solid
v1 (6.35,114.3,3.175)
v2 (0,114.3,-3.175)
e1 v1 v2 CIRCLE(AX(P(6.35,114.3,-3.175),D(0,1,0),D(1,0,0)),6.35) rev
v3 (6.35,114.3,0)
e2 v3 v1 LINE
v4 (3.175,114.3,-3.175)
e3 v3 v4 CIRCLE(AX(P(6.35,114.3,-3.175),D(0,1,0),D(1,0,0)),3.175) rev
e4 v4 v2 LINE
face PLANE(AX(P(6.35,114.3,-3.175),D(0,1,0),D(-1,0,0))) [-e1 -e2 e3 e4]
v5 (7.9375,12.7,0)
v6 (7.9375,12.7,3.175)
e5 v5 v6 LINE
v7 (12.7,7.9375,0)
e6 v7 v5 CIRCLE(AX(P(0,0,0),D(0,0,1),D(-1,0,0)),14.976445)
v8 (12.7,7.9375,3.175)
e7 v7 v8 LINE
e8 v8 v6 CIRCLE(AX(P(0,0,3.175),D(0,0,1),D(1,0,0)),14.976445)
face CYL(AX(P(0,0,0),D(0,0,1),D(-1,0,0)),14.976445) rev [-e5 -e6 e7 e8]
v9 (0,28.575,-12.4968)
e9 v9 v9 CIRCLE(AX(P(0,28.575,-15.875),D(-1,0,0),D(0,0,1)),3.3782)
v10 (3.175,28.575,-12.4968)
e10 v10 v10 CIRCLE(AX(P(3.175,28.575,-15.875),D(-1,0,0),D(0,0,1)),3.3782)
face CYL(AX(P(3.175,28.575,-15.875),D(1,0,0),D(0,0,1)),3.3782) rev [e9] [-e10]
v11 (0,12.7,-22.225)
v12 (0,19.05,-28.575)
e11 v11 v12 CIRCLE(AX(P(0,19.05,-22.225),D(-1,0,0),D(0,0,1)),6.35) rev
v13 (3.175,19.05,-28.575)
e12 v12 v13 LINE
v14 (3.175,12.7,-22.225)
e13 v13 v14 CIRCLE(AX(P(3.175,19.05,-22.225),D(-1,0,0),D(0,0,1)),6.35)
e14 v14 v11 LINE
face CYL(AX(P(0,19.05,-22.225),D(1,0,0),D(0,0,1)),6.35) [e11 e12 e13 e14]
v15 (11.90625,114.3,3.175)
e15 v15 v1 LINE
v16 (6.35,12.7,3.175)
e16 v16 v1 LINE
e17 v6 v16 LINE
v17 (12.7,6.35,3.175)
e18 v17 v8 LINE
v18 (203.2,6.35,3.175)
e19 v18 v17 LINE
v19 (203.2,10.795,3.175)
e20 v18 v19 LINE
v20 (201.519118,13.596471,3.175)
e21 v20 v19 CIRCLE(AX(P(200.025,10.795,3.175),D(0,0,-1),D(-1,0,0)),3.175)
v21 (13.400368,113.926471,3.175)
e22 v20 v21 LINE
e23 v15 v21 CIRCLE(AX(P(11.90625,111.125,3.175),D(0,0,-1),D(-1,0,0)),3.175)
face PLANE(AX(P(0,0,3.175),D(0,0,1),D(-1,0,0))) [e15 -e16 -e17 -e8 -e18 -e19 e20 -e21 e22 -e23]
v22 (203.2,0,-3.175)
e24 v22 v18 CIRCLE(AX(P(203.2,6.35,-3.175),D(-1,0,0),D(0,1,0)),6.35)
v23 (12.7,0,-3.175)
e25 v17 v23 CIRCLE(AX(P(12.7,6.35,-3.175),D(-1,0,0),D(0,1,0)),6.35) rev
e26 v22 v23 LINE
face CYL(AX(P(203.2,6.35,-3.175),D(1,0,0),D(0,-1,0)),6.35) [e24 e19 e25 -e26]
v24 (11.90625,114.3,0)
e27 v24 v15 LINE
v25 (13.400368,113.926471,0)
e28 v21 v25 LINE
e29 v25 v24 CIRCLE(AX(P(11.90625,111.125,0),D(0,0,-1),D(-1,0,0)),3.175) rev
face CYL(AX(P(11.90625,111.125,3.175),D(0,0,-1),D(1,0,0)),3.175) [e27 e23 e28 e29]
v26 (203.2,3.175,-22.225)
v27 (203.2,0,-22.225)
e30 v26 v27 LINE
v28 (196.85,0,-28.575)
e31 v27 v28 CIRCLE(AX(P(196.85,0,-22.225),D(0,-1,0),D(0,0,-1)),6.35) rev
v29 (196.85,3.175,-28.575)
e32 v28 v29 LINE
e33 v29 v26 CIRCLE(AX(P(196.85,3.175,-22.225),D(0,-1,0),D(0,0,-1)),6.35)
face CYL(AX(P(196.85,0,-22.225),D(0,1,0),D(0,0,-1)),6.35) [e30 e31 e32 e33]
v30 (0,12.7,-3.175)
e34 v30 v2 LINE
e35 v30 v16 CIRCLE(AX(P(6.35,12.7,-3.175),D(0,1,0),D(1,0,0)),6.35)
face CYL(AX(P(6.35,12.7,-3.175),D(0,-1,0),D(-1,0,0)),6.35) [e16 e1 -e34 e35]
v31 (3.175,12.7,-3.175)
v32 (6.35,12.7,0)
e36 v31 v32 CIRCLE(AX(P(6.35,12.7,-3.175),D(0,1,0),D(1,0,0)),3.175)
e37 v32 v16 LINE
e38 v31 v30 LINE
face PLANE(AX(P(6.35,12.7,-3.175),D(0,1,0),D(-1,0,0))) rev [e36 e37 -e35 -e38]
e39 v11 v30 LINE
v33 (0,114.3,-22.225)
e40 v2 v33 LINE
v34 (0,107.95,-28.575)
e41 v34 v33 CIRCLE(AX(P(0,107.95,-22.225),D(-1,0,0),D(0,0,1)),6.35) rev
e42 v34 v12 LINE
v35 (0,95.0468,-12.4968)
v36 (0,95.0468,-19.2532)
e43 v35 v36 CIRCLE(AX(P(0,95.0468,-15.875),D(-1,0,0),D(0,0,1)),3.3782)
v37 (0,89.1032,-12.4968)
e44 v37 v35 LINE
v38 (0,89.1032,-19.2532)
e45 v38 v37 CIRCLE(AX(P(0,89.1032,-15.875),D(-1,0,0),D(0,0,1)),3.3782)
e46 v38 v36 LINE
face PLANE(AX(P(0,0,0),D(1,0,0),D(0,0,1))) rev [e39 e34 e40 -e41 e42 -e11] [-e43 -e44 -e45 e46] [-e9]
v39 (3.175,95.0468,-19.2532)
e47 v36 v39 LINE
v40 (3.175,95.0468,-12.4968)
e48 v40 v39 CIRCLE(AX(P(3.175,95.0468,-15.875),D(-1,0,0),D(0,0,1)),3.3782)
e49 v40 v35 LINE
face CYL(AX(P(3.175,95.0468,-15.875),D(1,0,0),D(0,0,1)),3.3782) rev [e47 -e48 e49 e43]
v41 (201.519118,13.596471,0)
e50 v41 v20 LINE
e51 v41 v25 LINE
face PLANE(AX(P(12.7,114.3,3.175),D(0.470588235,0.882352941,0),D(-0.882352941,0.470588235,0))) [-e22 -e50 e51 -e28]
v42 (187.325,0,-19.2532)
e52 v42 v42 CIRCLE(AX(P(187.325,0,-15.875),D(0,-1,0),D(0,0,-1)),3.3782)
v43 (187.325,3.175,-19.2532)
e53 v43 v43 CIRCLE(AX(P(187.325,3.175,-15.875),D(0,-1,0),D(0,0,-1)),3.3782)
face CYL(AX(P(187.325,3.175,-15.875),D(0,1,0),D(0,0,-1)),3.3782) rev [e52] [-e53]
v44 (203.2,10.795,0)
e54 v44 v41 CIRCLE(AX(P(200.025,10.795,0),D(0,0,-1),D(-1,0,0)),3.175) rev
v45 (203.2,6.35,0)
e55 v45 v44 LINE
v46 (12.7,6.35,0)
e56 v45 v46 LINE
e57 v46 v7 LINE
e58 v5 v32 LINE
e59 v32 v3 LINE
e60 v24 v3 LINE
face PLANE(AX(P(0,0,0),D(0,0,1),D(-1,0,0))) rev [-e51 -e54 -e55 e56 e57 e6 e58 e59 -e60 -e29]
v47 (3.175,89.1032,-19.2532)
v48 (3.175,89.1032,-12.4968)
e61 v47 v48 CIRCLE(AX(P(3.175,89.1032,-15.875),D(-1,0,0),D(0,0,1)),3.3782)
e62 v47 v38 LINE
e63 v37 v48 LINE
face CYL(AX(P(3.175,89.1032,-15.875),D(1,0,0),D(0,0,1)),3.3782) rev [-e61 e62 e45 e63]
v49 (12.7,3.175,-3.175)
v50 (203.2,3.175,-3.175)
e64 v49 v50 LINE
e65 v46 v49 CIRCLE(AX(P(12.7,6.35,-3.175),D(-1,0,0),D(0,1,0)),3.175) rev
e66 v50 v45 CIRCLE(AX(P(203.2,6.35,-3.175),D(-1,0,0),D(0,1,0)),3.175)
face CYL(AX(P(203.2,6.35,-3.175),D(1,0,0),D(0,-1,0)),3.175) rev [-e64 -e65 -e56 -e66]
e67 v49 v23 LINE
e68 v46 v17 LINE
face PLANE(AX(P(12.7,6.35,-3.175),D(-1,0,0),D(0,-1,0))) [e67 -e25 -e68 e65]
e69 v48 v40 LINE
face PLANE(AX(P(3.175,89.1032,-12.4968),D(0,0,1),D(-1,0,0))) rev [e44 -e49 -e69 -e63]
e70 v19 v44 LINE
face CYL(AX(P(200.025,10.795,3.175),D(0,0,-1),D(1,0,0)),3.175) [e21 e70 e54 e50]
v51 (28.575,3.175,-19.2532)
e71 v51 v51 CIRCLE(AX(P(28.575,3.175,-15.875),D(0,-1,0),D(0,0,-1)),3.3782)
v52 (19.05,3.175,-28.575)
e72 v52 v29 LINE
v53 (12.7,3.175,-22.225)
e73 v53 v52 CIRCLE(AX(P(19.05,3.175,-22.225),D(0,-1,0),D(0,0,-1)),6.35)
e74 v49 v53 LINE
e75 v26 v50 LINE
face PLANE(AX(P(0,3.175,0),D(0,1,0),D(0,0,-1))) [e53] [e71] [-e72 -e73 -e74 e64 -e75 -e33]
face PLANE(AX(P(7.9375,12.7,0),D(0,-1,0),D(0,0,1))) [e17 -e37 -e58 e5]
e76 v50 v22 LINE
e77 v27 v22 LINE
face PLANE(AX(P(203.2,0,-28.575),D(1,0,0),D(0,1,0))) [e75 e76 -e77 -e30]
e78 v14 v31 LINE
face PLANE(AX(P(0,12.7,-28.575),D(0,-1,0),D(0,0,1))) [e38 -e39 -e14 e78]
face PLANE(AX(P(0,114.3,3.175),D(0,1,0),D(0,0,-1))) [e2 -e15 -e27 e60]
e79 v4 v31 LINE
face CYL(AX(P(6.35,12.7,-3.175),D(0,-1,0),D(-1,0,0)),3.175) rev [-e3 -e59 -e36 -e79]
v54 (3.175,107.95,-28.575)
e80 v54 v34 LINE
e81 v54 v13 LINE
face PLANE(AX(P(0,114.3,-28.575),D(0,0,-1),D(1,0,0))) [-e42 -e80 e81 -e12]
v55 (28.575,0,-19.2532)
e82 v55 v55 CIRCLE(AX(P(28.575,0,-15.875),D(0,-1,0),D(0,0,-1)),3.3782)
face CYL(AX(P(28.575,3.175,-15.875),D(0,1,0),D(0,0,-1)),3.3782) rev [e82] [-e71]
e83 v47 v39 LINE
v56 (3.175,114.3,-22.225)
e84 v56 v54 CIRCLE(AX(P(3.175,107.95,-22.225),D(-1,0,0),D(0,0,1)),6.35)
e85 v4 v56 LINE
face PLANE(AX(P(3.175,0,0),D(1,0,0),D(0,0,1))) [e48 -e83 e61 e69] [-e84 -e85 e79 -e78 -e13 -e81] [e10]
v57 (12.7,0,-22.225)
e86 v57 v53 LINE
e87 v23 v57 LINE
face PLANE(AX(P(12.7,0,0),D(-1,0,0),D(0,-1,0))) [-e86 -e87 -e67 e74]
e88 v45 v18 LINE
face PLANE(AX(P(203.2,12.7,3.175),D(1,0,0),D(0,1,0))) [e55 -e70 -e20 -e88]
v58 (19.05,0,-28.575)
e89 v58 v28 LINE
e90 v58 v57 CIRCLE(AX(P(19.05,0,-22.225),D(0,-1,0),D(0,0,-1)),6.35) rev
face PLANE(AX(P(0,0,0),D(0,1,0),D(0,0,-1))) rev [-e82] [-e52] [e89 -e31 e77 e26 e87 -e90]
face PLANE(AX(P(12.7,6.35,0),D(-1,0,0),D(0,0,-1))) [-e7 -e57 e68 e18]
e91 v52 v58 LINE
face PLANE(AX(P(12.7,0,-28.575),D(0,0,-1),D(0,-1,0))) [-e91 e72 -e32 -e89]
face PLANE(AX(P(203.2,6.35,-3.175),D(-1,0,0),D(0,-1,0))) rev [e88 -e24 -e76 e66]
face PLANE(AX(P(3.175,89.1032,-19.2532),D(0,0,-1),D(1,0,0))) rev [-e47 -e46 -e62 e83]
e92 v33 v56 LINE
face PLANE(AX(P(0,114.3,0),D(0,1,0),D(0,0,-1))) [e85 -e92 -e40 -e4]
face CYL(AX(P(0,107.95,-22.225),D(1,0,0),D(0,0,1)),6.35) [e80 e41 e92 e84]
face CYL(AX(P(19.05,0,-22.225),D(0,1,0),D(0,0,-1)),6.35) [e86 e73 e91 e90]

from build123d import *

# Parameters (mm, degrees)
BASE_FLANGE1_DEPTH                = 3.175
EDGE_FLANGE2_STRIP_W              = 19.05
EDGE_FLANGE2_STRIP_H              = 3.175
EDGE_FLANGE2_STRIP_CUT_DEPTH      = 190.5
EDGE_FLANGE2_RELIEF_W             = 20.6375
EDGE_FLANGE2_RELIEF_H             = 1.5875
EDGE_FLANGE2_RELIEF_CUT_DEPTH     = 3.175
EDGE_FLANGE2_STRIP_2_W            = 19.05
EDGE_FLANGE2_STRIP_2_H            = 3.175
EDGE_FLANGE2_STRIP_CUT_2_DEPTH    = 101.6
EDGE_FLANGE2_RELIEF_2_W           = 20.6375
EDGE_FLANGE2_RELIEF_2_H           = 1.5875
EDGE_FLANGE2_RELIEF_CUT_2_DEPTH   = 3.175
EDGE_FLANGE2_DEPTH                = 190.5
EDGE_FLANGE2_BEND_DEPTH           = 101.6
F_1_4_CLEARANCE_HOLE1_D           = 6.7564
F_1_4_CLEARANCE_HOLE1_ON_FACE_2_D = 6.7564
CUT_EXTRUDE1_DEPTH                = 235.885633075
FILLET1_R                         = 3.175
FILLET2_R                         = 6.35
F_1_4_START                       = -1
F_1_4_CLEARANCE_SLOT1_DEPTH       = 5
BODY_MOVE_COPY1_OUTLINE_R         = 3.3782
BODY_MOVE_COPY1_DEPTH             = 203.2
BODY_MOVE_COPY1_START             = 12.7
BODY_MOVE_COPY1_2_DEPTH           = 190.5
BODY_MOVE_COPY1_3_OUTLINE_R       = 3.3782
BODY_MOVE_COPY1_3_DEPTH           = 3.175
BODY_MOVE_COPY1_START_2           = 3.175
BODY_MOVE_COPY1_4_OUTLINE_W       = 101.6
BODY_MOVE_COPY1_4_OUTLINE_H       = 6.35
BODY_MOVE_COPY1_4_DEPTH           = 9.525
BODY_MOVE_COPY1_START_3           = 7.9375
BODY_MOVE_COPY1_5_DEPTH           = 4.7625
BODY_MOVE_COPY1_START_4           = 6.35
BODY_MOVE_COPY1_6_DEPTH           = 107.95
BODY_MOVE_COPY1_7_OUTLINE_W       = 4.7625
BODY_MOVE_COPY1_7_OUTLINE_H       = 6.35
BODY_MOVE_COPY1_7_OUTLINE_R       = 3.3782
BODY_MOVE_COPY1_7_DEPTH           = 7.9375
BODY_MOVE_COPY1_8_DEPTH           = 3.175
BODY_MOVE_COPY1_START_5           = -1
BODY_MOVE_COPY1_9_DEPTH           = 7.35
BODY_MOVE_COPY1_10_DEPTH          = 190.5


with BuildPart() as part:
    # Base-Flange1: sheet metal written as solids
    # Sketch3 → Base-Flange1 (new body)
    with BuildSketch(Plane.XY):
        with BuildLine():
            Line((0, 12.7), (0, 114.3))
            Line((0, 114.3), (12.7, 114.3))
            Line((12.7, 114.3), (203.2, 12.7))
            Line((203.2, 12.7), (203.2, 0))
            Line((203.2, 0), (12.7, 0))
            ThreePointArc((12.7, 0), (8.980256121, 8.980256121), (0, 12.7))
        make_face()
    extrude(amount=-BASE_FLANGE1_DEPTH)

    # Edge-Flange2: sheet metal written as solids
    # Edge-Flange2 strip (on a plane across the edge) → Edge-Flange2 strip cut (cut)
    with BuildSketch(Plane.YZ.offset(12.7)):
        with Locations((-3.175, -1.5875)):
            Rectangle(EDGE_FLANGE2_STRIP_W, EDGE_FLANGE2_STRIP_H)
    extrude(amount=EDGE_FLANGE2_STRIP_CUT_DEPTH, mode=Mode.SUBTRACT)

    # Edge-Flange2 relief (on the sheet) → Edge-Flange2 relief cut (cut)
    with BuildSketch(Plane(origin=(12.7, 6.35, 0), x_dir=(0, 1, 0), z_dir=(0, 0, 1))):
        with Locations((-8.73125, 0.79375)):
            Rectangle(EDGE_FLANGE2_RELIEF_W, EDGE_FLANGE2_RELIEF_H)
    extrude(amount=-EDGE_FLANGE2_RELIEF_CUT_DEPTH, mode=Mode.SUBTRACT)

    # Edge-Flange2 strip 2 (on a plane across the edge) → Edge-Flange2 strip cut 2 (cut)
    with BuildSketch(Plane.XZ.offset(-114.3)):
        with Locations((-3.175, -1.5875)):
            Rectangle(EDGE_FLANGE2_STRIP_2_W, EDGE_FLANGE2_STRIP_2_H)
    extrude(amount=EDGE_FLANGE2_STRIP_CUT_2_DEPTH, mode=Mode.SUBTRACT)

    # Edge-Flange2 relief 2 (on the sheet) → Edge-Flange2 relief cut 2 (cut)
    with BuildSketch(Plane(origin=(6.35, 114.3, 0), x_dir=(1, 0, 0), z_dir=(0, 0, 1))):
        with Locations((-8.73125, -102.39375)):
            Rectangle(EDGE_FLANGE2_RELIEF_2_W, EDGE_FLANGE2_RELIEF_2_H)
    extrude(amount=-EDGE_FLANGE2_RELIEF_CUT_2_DEPTH, mode=Mode.SUBTRACT)

    # Edge-Flange2 section (on a plane across the edge) → Edge-Flange2 (add)
    with BuildSketch(Plane.YZ.offset(12.7)):
        with BuildLine():
            Line((0, 3.175), (0, 28.575))
            Line((0, 28.575), (3.175, 28.575))
            Line((3.175, 28.575), (3.175, 3.175))
            ThreePointArc((3.175, 3.175), (4.10493597, 0.92993597), (6.35, 0))
            Line((6.35, 0), (6.35, -3.175))
            ThreePointArc((6.35, -3.175), (1.859871939, -1.315128061), (0, 3.175))
        make_face()
    extrude(amount=EDGE_FLANGE2_DEPTH)

    # Edge-Flange2 section 2 (on a plane across the edge) → Edge-Flange2 bend (add)
    with BuildSketch(Plane.XZ.offset(-114.3)):
        with BuildLine():
            Line((0, 3.175), (0, 28.575))
            Line((0, 28.575), (3.175, 28.575))
            Line((3.175, 28.575), (3.175, 3.175))
            ThreePointArc((3.175, 3.175), (4.10493597, 0.92993597), (6.35, 0))
            Line((6.35, 0), (6.35, -3.175))
            ThreePointArc((6.35, -3.175), (1.859871939, -1.315128061), (0, 3.175))
        make_face()
    extrude(amount=EDGE_FLANGE2_BEND_DEPTH)

    # 1/4 Clearance Hole1 (through all)
    with Locations(Plane(origin=(3.175, 28.575, 15.875), x_dir=(0, 0, 1), z_dir=(1, 0, 0))):
        with Locations((0, 0), (0, -63.5)):
            Hole(F_1_4_CLEARANCE_HOLE1_D / 2)

    # 1/4 Clearance Hole1 on face 2 (through all)
    with Locations(Plane(origin=(28.575, 3.175, 15.875), x_dir=(0, 0, 1), z_dir=(0, 1, 0))):
        with Locations((0, 0), (0, 158.75)):
            Hole(F_1_4_CLEARANCE_HOLE1_ON_FACE_2_D / 2)

    # Sketch27 → Cut-Extrude1 (cut, through all)
    with BuildSketch(Plane.XY):
        with BuildLine():
            Line((7.9375, 12.7), (0, 12.7))
            Line((0, 12.7), (0, 0))
            Line((0, 0), (12.7, 0))
            Line((12.7, 0), (12.7, 7.9375))
            ThreePointArc((12.7, 7.9375), (10.589945851, 10.589945851), (7.9375, 12.7))
        make_face()
    extrude(amount=-CUT_EXTRUDE1_DEPTH, mode=Mode.SUBTRACT)

    # Fillet1
    fillet1_edges = [part.edges().sort_by_distance(p)[0] for p in [
        (12.7, 114.3, -1.5875),
        (203.2, 12.7, -1.5875),
    ]]
    fillet(fillet1_edges, radius=FILLET1_R)

    # Fillet2
    fillet2_edges = [part.edges().sort_by_distance(p)[0] for p in [
        (12.7, 1.5875, 28.575),
        (203.2, 1.5875, 28.575),
        (1.5875, 114.3, 28.575),
        (1.5875, 12.7, 28.575),
    ]]
    fillet(fillet2_edges, radius=FILLET2_R)

    # 1/4 Clearance Slot1: read off the stored shape, not the designer's step
    # 1/4 Clearance Slot1 outline → 1/4 Clearance Slot1 (cut)
    with BuildSketch(Plane.YZ.offset(F_1_4_START)):
        with BuildLine():
            ThreePointArc((95.0468, 12.4968), (98.425, 15.875), (95.0468, 19.2532))
            Line((95.0468, 19.2532), (92.075, 19.2532))
            ThreePointArc((92.075, 19.2532), (95.4532, 15.875), (92.075, 12.4968))
            Line((92.075, 12.4968), (95.0468, 12.4968))
        make_face()
        with BuildLine():
            ThreePointArc((92.075, 12.4968), (88.6968, 15.875), (92.075, 19.2532))
            Line((92.075, 19.2532), (89.1032, 19.2532))
            ThreePointArc((89.1032, 19.2532), (85.725, 15.875), (89.1032, 12.4968))
            Line((89.1032, 12.4968), (92.075, 12.4968))
        make_face()
    extrude(amount=F_1_4_CLEARANCE_SLOT1_DEPTH, mode=Mode.SUBTRACT)

    # Body-Move/Copy1: read off the stored shape, not the designer's step
    # Body-Move/Copy1 outline → Body-Move/Copy1 (cut)
    # profile 1 of 2: a face of its own
    with BuildSketch(Plane.YZ):
        with BuildLine():
            Line((12.7, 3.175), (114.3, 3.175))
            Line((114.3, 3.175), (114.3, 22.225))
            ThreePointArc((114.3, 22.225), (112.440128061, 26.715128061), (107.95, 28.575))
            Line((107.95, 28.575), (19.05, 28.575))
            ThreePointArc((19.05, 28.575), (14.559871939, 26.715128061), (12.7, 22.225))
            Line((12.7, 22.225), (12.7, 3.175))
        make_face()
        with Locations((28.575, 15.875)):
            Circle(BODY_MOVE_COPY1_OUTLINE_R, mode=Mode.SUBTRACT)
        with BuildLine():
            Line((89.1032, 19.2532), (95.0468, 19.2532))
            ThreePointArc((95.0468, 19.2532), (98.425, 15.875), (95.0468, 12.4968))
            Line((95.0468, 12.4968), (89.1032, 12.4968))
            ThreePointArc((89.1032, 12.4968), (85.725, 15.875), (89.1032, 19.2532))
        make_face(mode=Mode.SUBTRACT)
    # profile 2 of 2: a face of its own
    with BuildSketch(Plane.YZ):
        with BuildLine():
            ThreePointArc((0.850738685, 0), (1.90100414, 1.355886872), (3.275819469, 2.381250001))
            ThreePointArc((3.275819469, 2.381250001), (3.200305714, 2.774936372), (3.175, 3.175))
            Line((3.175, 3.175), (3.175, 28.575))
            Line((3.175, 28.575), (0, 28.575))
            Line((0, 28.575), (0, 3.175))
            ThreePointArc((0, 3.175), (0.216371003, 1.531499064), (0.850738685, 0))
        make_face()
    extrude(amount=BODY_MOVE_COPY1_DEPTH, mode=Mode.SUBTRACT)

    # Body-Move_Copy1 2 outline → Body-Move_Copy1 2 (add)
    with BuildSketch(Plane.YZ.offset(BODY_MOVE_COPY1_START)):
        with BuildLine():
            Line((114.3, 3.175), (6.35, 3.175))
            ThreePointArc((6.35, 3.175), (4.7625, 2.973361062), (3.275819469, 2.381250001))
            ThreePointArc((3.275819469, 2.381250001), (4.405717517, 0.664942108), (6.35, 0))
            ThreePointArc((6.35, 0), (4.405717517, -0.664942108), (3.275819469, -2.381250001))
            ThreePointArc((3.275819469, -2.381250001), (4.7625, -2.973361062), (6.35, -3.175))
            Line((6.35, -3.175), (114.3, -3.175))
            Line((114.3, -3.175), (114.3, 3.175))
        make_face()
        with BuildLine():
            ThreePointArc((3.275819469, -2.381250001), (1.90100414, -1.355886872), (0.850738685, 0))
            ThreePointArc((0.850738685, 0), (0.216371003, -1.531499064), (0, -3.175))
            Line((0, -3.175), (0, -28.575))
            Line((0, -28.575), (3.175, -28.575))
            Line((3.175, -28.575), (3.175, -3.175))
            ThreePointArc((3.175, -3.175), (3.200305714, -2.774936372), (3.275819469, -2.381250001))
        make_face()
    extrude(amount=BODY_MOVE_COPY1_2_DEPTH)

    # Body-Move_Copy1 3 outline → Body-Move_Copy1 3 (add)
    with BuildSketch(Plane.YZ):
        with BuildLine():
            Line((114.3, 3.175), (12.7, 3.175))
            Line((12.7, 3.175), (12.7, -22.225))
            ThreePointArc((12.7, -22.225), (14.559871939, -26.715128061), (19.05, -28.575))
            Line((19.05, -28.575), (107.95, -28.575))
            ThreePointArc((107.95, -28.575), (112.440128061, -26.715128061), (114.3, -22.225))
            Line((114.3, -22.225), (114.3, 3.175))
        make_face()
        with BuildLine():
            ThreePointArc((89.1032, -19.2532), (85.725, -15.875), (89.1032, -12.4968))
            Line((89.1032, -12.4968), (95.0468, -12.4968))
            ThreePointArc((95.0468, -12.4968), (98.425, -15.875), (95.0468, -19.2532))
            Line((95.0468, -19.2532), (89.1032, -19.2532))
        make_face(mode=Mode.SUBTRACT)
        with Locations((28.575, -15.875)):
            Circle(BODY_MOVE_COPY1_3_OUTLINE_R, mode=Mode.SUBTRACT)
    extrude(amount=BODY_MOVE_COPY1_3_DEPTH)

    # Body-Move_Copy1 4 outline → Body-Move_Copy1 4 (add)
    with BuildSketch(Plane.YZ.offset(BODY_MOVE_COPY1_START_2)):
        with Locations((63.5, 0)):
            Rectangle(BODY_MOVE_COPY1_4_OUTLINE_W, BODY_MOVE_COPY1_4_OUTLINE_H)
    extrude(amount=BODY_MOVE_COPY1_4_DEPTH)

    # Body-Move_Copy1 5 outline → Body-Move_Copy1 5 (add)
    with BuildSketch(Plane.YZ.offset(BODY_MOVE_COPY1_START_3)):
        with BuildLine():
            Line((12.7, -3.175), (12.7, 3.175))
            Line((12.7, 3.175), (6.35, 3.175))
            ThreePointArc((6.35, 3.175), (4.7625, 2.973361062), (3.275819469, 2.381250001))
            ThreePointArc((3.275819469, 2.381250001), (4.405717517, 0.664942108), (6.35, 0))
            ThreePointArc((6.35, 0), (4.405717517, -0.664942108), (3.275819469, -2.381250001))
            ThreePointArc((3.275819469, -2.381250001), (4.7625, -2.973361062), (6.35, -3.175))
            Line((6.35, -3.175), (12.7, -3.175))
        make_face()
    extrude(amount=BODY_MOVE_COPY1_5_DEPTH)

    # Body-Move_Copy1 6 outline → Body-Move_Copy1 6 (cut)
    with BuildSketch(Plane(origin=(0, 0, 0), x_dir=(1, 0, 0), z_dir=(0, 1, 0)).offset(BODY_MOVE_COPY1_START_4)):
        with BuildLine():
            Line((203.2, 3.175), (3.175, 3.175))
            ThreePointArc((3.175, 3.175), (4.10493597, 0.92993597), (6.35, 0))
            Line((6.35, 0), (203.2, 0))
            Line((203.2, 0), (203.2, 3.175))
        make_face()
        with BuildLine():
            Line((0, -3.175), (6.35, -3.175))
            ThreePointArc((6.35, -3.175), (1.859871939, -1.315128061), (0, 3.175))
            Line((0, 3.175), (0, -3.175))
        make_face()
    extrude(amount=BODY_MOVE_COPY1_6_DEPTH, mode=Mode.SUBTRACT)

    # Body-Move_Copy1 7 outline → Body-Move_Copy1 7 (cut)
    with BuildSketch(Plane(origin=(0, 0, 0), x_dir=(1, 0, 0), z_dir=(0, 1, 0))):
        with Locations((10.31875, 0)):
            Rectangle(BODY_MOVE_COPY1_7_OUTLINE_W, BODY_MOVE_COPY1_7_OUTLINE_H)
        with Locations((187.325, 15.875)):
            Circle(BODY_MOVE_COPY1_7_OUTLINE_R)
        with Locations((28.575, 15.875)):
            Circle(BODY_MOVE_COPY1_7_OUTLINE_R)
    extrude(amount=BODY_MOVE_COPY1_7_DEPTH, mode=Mode.SUBTRACT)

    # Body-Move_Copy1 8 outline → Body-Move_Copy1 8 (cut)
    with BuildSketch(Plane.XY):
        with BuildLine():
            Line((13.400367647, 113.926470588), (201.519117647, 13.596470588))
            ThreePointArc((201.519117647, 13.596470588), (202.747540039, 12.428524023), (203.2, 10.795))
            Line((203.2, 10.795), (203.2, 114.3))
            Line((203.2, 114.3), (11.90625, 114.3))
            ThreePointArc((11.90625, 114.3), (12.676300609, 114.205202438), (13.400367647, 113.926470588))
        make_face()
        with BuildLine():
            Line((7.9375, 7.9375), (12.7, 7.9375))
            ThreePointArc((12.7, 7.9375), (10.589945851, 10.589945851), (7.9375, 12.7))
            Line((7.9375, 12.7), (7.9375, 7.9375))
        make_face()
    extrude(amount=BODY_MOVE_COPY1_8_DEPTH, mode=Mode.SUBTRACT)

    # Body-Move_Copy1 9 outline → Body-Move_Copy1 9 (cut)
    with BuildSketch(Plane(origin=(0, 0, 0), x_dir=(1, 0, 0), z_dir=(0, 1, 0)).offset(BODY_MOVE_COPY1_START_5)):
        with BuildLine():
            ThreePointArc((196.85, 28.575), (201.340128061, 26.715128061), (203.2, 22.225))
            Line((203.2, 22.225), (203.2, 28.575))
            Line((203.2, 28.575), (196.85, 28.575))
        make_face()
        with BuildLine():
            ThreePointArc((12.7, 22.225), (14.559871939, 26.715128061), (19.05, 28.575))
            Line((19.05, 28.575), (12.7, 28.575))
            Line((12.7, 28.575), (12.7, 22.225))
        make_face()
    extrude(amount=BODY_MOVE_COPY1_9_DEPTH, mode=Mode.SUBTRACT)

    # Body-Move_Copy1 10 outline → Body-Move_Copy1 10 (cut)
    with BuildSketch(Plane.YZ.offset(BODY_MOVE_COPY1_START)):
        with BuildLine():
            ThreePointArc((6.35, 0), (4.405717517, -0.664942108), (3.275819469, -2.381250001))
            ThreePointArc((3.275819469, -2.381250001), (4.7625, -2.973361062), (6.35, -3.175))
            Line((6.35, -3.175), (6.35, 0))
        make_face()
    extrude(amount=BODY_MOVE_COPY1_10_DEPTH, mode=Mode.SUBTRACT)


solid = part.part
